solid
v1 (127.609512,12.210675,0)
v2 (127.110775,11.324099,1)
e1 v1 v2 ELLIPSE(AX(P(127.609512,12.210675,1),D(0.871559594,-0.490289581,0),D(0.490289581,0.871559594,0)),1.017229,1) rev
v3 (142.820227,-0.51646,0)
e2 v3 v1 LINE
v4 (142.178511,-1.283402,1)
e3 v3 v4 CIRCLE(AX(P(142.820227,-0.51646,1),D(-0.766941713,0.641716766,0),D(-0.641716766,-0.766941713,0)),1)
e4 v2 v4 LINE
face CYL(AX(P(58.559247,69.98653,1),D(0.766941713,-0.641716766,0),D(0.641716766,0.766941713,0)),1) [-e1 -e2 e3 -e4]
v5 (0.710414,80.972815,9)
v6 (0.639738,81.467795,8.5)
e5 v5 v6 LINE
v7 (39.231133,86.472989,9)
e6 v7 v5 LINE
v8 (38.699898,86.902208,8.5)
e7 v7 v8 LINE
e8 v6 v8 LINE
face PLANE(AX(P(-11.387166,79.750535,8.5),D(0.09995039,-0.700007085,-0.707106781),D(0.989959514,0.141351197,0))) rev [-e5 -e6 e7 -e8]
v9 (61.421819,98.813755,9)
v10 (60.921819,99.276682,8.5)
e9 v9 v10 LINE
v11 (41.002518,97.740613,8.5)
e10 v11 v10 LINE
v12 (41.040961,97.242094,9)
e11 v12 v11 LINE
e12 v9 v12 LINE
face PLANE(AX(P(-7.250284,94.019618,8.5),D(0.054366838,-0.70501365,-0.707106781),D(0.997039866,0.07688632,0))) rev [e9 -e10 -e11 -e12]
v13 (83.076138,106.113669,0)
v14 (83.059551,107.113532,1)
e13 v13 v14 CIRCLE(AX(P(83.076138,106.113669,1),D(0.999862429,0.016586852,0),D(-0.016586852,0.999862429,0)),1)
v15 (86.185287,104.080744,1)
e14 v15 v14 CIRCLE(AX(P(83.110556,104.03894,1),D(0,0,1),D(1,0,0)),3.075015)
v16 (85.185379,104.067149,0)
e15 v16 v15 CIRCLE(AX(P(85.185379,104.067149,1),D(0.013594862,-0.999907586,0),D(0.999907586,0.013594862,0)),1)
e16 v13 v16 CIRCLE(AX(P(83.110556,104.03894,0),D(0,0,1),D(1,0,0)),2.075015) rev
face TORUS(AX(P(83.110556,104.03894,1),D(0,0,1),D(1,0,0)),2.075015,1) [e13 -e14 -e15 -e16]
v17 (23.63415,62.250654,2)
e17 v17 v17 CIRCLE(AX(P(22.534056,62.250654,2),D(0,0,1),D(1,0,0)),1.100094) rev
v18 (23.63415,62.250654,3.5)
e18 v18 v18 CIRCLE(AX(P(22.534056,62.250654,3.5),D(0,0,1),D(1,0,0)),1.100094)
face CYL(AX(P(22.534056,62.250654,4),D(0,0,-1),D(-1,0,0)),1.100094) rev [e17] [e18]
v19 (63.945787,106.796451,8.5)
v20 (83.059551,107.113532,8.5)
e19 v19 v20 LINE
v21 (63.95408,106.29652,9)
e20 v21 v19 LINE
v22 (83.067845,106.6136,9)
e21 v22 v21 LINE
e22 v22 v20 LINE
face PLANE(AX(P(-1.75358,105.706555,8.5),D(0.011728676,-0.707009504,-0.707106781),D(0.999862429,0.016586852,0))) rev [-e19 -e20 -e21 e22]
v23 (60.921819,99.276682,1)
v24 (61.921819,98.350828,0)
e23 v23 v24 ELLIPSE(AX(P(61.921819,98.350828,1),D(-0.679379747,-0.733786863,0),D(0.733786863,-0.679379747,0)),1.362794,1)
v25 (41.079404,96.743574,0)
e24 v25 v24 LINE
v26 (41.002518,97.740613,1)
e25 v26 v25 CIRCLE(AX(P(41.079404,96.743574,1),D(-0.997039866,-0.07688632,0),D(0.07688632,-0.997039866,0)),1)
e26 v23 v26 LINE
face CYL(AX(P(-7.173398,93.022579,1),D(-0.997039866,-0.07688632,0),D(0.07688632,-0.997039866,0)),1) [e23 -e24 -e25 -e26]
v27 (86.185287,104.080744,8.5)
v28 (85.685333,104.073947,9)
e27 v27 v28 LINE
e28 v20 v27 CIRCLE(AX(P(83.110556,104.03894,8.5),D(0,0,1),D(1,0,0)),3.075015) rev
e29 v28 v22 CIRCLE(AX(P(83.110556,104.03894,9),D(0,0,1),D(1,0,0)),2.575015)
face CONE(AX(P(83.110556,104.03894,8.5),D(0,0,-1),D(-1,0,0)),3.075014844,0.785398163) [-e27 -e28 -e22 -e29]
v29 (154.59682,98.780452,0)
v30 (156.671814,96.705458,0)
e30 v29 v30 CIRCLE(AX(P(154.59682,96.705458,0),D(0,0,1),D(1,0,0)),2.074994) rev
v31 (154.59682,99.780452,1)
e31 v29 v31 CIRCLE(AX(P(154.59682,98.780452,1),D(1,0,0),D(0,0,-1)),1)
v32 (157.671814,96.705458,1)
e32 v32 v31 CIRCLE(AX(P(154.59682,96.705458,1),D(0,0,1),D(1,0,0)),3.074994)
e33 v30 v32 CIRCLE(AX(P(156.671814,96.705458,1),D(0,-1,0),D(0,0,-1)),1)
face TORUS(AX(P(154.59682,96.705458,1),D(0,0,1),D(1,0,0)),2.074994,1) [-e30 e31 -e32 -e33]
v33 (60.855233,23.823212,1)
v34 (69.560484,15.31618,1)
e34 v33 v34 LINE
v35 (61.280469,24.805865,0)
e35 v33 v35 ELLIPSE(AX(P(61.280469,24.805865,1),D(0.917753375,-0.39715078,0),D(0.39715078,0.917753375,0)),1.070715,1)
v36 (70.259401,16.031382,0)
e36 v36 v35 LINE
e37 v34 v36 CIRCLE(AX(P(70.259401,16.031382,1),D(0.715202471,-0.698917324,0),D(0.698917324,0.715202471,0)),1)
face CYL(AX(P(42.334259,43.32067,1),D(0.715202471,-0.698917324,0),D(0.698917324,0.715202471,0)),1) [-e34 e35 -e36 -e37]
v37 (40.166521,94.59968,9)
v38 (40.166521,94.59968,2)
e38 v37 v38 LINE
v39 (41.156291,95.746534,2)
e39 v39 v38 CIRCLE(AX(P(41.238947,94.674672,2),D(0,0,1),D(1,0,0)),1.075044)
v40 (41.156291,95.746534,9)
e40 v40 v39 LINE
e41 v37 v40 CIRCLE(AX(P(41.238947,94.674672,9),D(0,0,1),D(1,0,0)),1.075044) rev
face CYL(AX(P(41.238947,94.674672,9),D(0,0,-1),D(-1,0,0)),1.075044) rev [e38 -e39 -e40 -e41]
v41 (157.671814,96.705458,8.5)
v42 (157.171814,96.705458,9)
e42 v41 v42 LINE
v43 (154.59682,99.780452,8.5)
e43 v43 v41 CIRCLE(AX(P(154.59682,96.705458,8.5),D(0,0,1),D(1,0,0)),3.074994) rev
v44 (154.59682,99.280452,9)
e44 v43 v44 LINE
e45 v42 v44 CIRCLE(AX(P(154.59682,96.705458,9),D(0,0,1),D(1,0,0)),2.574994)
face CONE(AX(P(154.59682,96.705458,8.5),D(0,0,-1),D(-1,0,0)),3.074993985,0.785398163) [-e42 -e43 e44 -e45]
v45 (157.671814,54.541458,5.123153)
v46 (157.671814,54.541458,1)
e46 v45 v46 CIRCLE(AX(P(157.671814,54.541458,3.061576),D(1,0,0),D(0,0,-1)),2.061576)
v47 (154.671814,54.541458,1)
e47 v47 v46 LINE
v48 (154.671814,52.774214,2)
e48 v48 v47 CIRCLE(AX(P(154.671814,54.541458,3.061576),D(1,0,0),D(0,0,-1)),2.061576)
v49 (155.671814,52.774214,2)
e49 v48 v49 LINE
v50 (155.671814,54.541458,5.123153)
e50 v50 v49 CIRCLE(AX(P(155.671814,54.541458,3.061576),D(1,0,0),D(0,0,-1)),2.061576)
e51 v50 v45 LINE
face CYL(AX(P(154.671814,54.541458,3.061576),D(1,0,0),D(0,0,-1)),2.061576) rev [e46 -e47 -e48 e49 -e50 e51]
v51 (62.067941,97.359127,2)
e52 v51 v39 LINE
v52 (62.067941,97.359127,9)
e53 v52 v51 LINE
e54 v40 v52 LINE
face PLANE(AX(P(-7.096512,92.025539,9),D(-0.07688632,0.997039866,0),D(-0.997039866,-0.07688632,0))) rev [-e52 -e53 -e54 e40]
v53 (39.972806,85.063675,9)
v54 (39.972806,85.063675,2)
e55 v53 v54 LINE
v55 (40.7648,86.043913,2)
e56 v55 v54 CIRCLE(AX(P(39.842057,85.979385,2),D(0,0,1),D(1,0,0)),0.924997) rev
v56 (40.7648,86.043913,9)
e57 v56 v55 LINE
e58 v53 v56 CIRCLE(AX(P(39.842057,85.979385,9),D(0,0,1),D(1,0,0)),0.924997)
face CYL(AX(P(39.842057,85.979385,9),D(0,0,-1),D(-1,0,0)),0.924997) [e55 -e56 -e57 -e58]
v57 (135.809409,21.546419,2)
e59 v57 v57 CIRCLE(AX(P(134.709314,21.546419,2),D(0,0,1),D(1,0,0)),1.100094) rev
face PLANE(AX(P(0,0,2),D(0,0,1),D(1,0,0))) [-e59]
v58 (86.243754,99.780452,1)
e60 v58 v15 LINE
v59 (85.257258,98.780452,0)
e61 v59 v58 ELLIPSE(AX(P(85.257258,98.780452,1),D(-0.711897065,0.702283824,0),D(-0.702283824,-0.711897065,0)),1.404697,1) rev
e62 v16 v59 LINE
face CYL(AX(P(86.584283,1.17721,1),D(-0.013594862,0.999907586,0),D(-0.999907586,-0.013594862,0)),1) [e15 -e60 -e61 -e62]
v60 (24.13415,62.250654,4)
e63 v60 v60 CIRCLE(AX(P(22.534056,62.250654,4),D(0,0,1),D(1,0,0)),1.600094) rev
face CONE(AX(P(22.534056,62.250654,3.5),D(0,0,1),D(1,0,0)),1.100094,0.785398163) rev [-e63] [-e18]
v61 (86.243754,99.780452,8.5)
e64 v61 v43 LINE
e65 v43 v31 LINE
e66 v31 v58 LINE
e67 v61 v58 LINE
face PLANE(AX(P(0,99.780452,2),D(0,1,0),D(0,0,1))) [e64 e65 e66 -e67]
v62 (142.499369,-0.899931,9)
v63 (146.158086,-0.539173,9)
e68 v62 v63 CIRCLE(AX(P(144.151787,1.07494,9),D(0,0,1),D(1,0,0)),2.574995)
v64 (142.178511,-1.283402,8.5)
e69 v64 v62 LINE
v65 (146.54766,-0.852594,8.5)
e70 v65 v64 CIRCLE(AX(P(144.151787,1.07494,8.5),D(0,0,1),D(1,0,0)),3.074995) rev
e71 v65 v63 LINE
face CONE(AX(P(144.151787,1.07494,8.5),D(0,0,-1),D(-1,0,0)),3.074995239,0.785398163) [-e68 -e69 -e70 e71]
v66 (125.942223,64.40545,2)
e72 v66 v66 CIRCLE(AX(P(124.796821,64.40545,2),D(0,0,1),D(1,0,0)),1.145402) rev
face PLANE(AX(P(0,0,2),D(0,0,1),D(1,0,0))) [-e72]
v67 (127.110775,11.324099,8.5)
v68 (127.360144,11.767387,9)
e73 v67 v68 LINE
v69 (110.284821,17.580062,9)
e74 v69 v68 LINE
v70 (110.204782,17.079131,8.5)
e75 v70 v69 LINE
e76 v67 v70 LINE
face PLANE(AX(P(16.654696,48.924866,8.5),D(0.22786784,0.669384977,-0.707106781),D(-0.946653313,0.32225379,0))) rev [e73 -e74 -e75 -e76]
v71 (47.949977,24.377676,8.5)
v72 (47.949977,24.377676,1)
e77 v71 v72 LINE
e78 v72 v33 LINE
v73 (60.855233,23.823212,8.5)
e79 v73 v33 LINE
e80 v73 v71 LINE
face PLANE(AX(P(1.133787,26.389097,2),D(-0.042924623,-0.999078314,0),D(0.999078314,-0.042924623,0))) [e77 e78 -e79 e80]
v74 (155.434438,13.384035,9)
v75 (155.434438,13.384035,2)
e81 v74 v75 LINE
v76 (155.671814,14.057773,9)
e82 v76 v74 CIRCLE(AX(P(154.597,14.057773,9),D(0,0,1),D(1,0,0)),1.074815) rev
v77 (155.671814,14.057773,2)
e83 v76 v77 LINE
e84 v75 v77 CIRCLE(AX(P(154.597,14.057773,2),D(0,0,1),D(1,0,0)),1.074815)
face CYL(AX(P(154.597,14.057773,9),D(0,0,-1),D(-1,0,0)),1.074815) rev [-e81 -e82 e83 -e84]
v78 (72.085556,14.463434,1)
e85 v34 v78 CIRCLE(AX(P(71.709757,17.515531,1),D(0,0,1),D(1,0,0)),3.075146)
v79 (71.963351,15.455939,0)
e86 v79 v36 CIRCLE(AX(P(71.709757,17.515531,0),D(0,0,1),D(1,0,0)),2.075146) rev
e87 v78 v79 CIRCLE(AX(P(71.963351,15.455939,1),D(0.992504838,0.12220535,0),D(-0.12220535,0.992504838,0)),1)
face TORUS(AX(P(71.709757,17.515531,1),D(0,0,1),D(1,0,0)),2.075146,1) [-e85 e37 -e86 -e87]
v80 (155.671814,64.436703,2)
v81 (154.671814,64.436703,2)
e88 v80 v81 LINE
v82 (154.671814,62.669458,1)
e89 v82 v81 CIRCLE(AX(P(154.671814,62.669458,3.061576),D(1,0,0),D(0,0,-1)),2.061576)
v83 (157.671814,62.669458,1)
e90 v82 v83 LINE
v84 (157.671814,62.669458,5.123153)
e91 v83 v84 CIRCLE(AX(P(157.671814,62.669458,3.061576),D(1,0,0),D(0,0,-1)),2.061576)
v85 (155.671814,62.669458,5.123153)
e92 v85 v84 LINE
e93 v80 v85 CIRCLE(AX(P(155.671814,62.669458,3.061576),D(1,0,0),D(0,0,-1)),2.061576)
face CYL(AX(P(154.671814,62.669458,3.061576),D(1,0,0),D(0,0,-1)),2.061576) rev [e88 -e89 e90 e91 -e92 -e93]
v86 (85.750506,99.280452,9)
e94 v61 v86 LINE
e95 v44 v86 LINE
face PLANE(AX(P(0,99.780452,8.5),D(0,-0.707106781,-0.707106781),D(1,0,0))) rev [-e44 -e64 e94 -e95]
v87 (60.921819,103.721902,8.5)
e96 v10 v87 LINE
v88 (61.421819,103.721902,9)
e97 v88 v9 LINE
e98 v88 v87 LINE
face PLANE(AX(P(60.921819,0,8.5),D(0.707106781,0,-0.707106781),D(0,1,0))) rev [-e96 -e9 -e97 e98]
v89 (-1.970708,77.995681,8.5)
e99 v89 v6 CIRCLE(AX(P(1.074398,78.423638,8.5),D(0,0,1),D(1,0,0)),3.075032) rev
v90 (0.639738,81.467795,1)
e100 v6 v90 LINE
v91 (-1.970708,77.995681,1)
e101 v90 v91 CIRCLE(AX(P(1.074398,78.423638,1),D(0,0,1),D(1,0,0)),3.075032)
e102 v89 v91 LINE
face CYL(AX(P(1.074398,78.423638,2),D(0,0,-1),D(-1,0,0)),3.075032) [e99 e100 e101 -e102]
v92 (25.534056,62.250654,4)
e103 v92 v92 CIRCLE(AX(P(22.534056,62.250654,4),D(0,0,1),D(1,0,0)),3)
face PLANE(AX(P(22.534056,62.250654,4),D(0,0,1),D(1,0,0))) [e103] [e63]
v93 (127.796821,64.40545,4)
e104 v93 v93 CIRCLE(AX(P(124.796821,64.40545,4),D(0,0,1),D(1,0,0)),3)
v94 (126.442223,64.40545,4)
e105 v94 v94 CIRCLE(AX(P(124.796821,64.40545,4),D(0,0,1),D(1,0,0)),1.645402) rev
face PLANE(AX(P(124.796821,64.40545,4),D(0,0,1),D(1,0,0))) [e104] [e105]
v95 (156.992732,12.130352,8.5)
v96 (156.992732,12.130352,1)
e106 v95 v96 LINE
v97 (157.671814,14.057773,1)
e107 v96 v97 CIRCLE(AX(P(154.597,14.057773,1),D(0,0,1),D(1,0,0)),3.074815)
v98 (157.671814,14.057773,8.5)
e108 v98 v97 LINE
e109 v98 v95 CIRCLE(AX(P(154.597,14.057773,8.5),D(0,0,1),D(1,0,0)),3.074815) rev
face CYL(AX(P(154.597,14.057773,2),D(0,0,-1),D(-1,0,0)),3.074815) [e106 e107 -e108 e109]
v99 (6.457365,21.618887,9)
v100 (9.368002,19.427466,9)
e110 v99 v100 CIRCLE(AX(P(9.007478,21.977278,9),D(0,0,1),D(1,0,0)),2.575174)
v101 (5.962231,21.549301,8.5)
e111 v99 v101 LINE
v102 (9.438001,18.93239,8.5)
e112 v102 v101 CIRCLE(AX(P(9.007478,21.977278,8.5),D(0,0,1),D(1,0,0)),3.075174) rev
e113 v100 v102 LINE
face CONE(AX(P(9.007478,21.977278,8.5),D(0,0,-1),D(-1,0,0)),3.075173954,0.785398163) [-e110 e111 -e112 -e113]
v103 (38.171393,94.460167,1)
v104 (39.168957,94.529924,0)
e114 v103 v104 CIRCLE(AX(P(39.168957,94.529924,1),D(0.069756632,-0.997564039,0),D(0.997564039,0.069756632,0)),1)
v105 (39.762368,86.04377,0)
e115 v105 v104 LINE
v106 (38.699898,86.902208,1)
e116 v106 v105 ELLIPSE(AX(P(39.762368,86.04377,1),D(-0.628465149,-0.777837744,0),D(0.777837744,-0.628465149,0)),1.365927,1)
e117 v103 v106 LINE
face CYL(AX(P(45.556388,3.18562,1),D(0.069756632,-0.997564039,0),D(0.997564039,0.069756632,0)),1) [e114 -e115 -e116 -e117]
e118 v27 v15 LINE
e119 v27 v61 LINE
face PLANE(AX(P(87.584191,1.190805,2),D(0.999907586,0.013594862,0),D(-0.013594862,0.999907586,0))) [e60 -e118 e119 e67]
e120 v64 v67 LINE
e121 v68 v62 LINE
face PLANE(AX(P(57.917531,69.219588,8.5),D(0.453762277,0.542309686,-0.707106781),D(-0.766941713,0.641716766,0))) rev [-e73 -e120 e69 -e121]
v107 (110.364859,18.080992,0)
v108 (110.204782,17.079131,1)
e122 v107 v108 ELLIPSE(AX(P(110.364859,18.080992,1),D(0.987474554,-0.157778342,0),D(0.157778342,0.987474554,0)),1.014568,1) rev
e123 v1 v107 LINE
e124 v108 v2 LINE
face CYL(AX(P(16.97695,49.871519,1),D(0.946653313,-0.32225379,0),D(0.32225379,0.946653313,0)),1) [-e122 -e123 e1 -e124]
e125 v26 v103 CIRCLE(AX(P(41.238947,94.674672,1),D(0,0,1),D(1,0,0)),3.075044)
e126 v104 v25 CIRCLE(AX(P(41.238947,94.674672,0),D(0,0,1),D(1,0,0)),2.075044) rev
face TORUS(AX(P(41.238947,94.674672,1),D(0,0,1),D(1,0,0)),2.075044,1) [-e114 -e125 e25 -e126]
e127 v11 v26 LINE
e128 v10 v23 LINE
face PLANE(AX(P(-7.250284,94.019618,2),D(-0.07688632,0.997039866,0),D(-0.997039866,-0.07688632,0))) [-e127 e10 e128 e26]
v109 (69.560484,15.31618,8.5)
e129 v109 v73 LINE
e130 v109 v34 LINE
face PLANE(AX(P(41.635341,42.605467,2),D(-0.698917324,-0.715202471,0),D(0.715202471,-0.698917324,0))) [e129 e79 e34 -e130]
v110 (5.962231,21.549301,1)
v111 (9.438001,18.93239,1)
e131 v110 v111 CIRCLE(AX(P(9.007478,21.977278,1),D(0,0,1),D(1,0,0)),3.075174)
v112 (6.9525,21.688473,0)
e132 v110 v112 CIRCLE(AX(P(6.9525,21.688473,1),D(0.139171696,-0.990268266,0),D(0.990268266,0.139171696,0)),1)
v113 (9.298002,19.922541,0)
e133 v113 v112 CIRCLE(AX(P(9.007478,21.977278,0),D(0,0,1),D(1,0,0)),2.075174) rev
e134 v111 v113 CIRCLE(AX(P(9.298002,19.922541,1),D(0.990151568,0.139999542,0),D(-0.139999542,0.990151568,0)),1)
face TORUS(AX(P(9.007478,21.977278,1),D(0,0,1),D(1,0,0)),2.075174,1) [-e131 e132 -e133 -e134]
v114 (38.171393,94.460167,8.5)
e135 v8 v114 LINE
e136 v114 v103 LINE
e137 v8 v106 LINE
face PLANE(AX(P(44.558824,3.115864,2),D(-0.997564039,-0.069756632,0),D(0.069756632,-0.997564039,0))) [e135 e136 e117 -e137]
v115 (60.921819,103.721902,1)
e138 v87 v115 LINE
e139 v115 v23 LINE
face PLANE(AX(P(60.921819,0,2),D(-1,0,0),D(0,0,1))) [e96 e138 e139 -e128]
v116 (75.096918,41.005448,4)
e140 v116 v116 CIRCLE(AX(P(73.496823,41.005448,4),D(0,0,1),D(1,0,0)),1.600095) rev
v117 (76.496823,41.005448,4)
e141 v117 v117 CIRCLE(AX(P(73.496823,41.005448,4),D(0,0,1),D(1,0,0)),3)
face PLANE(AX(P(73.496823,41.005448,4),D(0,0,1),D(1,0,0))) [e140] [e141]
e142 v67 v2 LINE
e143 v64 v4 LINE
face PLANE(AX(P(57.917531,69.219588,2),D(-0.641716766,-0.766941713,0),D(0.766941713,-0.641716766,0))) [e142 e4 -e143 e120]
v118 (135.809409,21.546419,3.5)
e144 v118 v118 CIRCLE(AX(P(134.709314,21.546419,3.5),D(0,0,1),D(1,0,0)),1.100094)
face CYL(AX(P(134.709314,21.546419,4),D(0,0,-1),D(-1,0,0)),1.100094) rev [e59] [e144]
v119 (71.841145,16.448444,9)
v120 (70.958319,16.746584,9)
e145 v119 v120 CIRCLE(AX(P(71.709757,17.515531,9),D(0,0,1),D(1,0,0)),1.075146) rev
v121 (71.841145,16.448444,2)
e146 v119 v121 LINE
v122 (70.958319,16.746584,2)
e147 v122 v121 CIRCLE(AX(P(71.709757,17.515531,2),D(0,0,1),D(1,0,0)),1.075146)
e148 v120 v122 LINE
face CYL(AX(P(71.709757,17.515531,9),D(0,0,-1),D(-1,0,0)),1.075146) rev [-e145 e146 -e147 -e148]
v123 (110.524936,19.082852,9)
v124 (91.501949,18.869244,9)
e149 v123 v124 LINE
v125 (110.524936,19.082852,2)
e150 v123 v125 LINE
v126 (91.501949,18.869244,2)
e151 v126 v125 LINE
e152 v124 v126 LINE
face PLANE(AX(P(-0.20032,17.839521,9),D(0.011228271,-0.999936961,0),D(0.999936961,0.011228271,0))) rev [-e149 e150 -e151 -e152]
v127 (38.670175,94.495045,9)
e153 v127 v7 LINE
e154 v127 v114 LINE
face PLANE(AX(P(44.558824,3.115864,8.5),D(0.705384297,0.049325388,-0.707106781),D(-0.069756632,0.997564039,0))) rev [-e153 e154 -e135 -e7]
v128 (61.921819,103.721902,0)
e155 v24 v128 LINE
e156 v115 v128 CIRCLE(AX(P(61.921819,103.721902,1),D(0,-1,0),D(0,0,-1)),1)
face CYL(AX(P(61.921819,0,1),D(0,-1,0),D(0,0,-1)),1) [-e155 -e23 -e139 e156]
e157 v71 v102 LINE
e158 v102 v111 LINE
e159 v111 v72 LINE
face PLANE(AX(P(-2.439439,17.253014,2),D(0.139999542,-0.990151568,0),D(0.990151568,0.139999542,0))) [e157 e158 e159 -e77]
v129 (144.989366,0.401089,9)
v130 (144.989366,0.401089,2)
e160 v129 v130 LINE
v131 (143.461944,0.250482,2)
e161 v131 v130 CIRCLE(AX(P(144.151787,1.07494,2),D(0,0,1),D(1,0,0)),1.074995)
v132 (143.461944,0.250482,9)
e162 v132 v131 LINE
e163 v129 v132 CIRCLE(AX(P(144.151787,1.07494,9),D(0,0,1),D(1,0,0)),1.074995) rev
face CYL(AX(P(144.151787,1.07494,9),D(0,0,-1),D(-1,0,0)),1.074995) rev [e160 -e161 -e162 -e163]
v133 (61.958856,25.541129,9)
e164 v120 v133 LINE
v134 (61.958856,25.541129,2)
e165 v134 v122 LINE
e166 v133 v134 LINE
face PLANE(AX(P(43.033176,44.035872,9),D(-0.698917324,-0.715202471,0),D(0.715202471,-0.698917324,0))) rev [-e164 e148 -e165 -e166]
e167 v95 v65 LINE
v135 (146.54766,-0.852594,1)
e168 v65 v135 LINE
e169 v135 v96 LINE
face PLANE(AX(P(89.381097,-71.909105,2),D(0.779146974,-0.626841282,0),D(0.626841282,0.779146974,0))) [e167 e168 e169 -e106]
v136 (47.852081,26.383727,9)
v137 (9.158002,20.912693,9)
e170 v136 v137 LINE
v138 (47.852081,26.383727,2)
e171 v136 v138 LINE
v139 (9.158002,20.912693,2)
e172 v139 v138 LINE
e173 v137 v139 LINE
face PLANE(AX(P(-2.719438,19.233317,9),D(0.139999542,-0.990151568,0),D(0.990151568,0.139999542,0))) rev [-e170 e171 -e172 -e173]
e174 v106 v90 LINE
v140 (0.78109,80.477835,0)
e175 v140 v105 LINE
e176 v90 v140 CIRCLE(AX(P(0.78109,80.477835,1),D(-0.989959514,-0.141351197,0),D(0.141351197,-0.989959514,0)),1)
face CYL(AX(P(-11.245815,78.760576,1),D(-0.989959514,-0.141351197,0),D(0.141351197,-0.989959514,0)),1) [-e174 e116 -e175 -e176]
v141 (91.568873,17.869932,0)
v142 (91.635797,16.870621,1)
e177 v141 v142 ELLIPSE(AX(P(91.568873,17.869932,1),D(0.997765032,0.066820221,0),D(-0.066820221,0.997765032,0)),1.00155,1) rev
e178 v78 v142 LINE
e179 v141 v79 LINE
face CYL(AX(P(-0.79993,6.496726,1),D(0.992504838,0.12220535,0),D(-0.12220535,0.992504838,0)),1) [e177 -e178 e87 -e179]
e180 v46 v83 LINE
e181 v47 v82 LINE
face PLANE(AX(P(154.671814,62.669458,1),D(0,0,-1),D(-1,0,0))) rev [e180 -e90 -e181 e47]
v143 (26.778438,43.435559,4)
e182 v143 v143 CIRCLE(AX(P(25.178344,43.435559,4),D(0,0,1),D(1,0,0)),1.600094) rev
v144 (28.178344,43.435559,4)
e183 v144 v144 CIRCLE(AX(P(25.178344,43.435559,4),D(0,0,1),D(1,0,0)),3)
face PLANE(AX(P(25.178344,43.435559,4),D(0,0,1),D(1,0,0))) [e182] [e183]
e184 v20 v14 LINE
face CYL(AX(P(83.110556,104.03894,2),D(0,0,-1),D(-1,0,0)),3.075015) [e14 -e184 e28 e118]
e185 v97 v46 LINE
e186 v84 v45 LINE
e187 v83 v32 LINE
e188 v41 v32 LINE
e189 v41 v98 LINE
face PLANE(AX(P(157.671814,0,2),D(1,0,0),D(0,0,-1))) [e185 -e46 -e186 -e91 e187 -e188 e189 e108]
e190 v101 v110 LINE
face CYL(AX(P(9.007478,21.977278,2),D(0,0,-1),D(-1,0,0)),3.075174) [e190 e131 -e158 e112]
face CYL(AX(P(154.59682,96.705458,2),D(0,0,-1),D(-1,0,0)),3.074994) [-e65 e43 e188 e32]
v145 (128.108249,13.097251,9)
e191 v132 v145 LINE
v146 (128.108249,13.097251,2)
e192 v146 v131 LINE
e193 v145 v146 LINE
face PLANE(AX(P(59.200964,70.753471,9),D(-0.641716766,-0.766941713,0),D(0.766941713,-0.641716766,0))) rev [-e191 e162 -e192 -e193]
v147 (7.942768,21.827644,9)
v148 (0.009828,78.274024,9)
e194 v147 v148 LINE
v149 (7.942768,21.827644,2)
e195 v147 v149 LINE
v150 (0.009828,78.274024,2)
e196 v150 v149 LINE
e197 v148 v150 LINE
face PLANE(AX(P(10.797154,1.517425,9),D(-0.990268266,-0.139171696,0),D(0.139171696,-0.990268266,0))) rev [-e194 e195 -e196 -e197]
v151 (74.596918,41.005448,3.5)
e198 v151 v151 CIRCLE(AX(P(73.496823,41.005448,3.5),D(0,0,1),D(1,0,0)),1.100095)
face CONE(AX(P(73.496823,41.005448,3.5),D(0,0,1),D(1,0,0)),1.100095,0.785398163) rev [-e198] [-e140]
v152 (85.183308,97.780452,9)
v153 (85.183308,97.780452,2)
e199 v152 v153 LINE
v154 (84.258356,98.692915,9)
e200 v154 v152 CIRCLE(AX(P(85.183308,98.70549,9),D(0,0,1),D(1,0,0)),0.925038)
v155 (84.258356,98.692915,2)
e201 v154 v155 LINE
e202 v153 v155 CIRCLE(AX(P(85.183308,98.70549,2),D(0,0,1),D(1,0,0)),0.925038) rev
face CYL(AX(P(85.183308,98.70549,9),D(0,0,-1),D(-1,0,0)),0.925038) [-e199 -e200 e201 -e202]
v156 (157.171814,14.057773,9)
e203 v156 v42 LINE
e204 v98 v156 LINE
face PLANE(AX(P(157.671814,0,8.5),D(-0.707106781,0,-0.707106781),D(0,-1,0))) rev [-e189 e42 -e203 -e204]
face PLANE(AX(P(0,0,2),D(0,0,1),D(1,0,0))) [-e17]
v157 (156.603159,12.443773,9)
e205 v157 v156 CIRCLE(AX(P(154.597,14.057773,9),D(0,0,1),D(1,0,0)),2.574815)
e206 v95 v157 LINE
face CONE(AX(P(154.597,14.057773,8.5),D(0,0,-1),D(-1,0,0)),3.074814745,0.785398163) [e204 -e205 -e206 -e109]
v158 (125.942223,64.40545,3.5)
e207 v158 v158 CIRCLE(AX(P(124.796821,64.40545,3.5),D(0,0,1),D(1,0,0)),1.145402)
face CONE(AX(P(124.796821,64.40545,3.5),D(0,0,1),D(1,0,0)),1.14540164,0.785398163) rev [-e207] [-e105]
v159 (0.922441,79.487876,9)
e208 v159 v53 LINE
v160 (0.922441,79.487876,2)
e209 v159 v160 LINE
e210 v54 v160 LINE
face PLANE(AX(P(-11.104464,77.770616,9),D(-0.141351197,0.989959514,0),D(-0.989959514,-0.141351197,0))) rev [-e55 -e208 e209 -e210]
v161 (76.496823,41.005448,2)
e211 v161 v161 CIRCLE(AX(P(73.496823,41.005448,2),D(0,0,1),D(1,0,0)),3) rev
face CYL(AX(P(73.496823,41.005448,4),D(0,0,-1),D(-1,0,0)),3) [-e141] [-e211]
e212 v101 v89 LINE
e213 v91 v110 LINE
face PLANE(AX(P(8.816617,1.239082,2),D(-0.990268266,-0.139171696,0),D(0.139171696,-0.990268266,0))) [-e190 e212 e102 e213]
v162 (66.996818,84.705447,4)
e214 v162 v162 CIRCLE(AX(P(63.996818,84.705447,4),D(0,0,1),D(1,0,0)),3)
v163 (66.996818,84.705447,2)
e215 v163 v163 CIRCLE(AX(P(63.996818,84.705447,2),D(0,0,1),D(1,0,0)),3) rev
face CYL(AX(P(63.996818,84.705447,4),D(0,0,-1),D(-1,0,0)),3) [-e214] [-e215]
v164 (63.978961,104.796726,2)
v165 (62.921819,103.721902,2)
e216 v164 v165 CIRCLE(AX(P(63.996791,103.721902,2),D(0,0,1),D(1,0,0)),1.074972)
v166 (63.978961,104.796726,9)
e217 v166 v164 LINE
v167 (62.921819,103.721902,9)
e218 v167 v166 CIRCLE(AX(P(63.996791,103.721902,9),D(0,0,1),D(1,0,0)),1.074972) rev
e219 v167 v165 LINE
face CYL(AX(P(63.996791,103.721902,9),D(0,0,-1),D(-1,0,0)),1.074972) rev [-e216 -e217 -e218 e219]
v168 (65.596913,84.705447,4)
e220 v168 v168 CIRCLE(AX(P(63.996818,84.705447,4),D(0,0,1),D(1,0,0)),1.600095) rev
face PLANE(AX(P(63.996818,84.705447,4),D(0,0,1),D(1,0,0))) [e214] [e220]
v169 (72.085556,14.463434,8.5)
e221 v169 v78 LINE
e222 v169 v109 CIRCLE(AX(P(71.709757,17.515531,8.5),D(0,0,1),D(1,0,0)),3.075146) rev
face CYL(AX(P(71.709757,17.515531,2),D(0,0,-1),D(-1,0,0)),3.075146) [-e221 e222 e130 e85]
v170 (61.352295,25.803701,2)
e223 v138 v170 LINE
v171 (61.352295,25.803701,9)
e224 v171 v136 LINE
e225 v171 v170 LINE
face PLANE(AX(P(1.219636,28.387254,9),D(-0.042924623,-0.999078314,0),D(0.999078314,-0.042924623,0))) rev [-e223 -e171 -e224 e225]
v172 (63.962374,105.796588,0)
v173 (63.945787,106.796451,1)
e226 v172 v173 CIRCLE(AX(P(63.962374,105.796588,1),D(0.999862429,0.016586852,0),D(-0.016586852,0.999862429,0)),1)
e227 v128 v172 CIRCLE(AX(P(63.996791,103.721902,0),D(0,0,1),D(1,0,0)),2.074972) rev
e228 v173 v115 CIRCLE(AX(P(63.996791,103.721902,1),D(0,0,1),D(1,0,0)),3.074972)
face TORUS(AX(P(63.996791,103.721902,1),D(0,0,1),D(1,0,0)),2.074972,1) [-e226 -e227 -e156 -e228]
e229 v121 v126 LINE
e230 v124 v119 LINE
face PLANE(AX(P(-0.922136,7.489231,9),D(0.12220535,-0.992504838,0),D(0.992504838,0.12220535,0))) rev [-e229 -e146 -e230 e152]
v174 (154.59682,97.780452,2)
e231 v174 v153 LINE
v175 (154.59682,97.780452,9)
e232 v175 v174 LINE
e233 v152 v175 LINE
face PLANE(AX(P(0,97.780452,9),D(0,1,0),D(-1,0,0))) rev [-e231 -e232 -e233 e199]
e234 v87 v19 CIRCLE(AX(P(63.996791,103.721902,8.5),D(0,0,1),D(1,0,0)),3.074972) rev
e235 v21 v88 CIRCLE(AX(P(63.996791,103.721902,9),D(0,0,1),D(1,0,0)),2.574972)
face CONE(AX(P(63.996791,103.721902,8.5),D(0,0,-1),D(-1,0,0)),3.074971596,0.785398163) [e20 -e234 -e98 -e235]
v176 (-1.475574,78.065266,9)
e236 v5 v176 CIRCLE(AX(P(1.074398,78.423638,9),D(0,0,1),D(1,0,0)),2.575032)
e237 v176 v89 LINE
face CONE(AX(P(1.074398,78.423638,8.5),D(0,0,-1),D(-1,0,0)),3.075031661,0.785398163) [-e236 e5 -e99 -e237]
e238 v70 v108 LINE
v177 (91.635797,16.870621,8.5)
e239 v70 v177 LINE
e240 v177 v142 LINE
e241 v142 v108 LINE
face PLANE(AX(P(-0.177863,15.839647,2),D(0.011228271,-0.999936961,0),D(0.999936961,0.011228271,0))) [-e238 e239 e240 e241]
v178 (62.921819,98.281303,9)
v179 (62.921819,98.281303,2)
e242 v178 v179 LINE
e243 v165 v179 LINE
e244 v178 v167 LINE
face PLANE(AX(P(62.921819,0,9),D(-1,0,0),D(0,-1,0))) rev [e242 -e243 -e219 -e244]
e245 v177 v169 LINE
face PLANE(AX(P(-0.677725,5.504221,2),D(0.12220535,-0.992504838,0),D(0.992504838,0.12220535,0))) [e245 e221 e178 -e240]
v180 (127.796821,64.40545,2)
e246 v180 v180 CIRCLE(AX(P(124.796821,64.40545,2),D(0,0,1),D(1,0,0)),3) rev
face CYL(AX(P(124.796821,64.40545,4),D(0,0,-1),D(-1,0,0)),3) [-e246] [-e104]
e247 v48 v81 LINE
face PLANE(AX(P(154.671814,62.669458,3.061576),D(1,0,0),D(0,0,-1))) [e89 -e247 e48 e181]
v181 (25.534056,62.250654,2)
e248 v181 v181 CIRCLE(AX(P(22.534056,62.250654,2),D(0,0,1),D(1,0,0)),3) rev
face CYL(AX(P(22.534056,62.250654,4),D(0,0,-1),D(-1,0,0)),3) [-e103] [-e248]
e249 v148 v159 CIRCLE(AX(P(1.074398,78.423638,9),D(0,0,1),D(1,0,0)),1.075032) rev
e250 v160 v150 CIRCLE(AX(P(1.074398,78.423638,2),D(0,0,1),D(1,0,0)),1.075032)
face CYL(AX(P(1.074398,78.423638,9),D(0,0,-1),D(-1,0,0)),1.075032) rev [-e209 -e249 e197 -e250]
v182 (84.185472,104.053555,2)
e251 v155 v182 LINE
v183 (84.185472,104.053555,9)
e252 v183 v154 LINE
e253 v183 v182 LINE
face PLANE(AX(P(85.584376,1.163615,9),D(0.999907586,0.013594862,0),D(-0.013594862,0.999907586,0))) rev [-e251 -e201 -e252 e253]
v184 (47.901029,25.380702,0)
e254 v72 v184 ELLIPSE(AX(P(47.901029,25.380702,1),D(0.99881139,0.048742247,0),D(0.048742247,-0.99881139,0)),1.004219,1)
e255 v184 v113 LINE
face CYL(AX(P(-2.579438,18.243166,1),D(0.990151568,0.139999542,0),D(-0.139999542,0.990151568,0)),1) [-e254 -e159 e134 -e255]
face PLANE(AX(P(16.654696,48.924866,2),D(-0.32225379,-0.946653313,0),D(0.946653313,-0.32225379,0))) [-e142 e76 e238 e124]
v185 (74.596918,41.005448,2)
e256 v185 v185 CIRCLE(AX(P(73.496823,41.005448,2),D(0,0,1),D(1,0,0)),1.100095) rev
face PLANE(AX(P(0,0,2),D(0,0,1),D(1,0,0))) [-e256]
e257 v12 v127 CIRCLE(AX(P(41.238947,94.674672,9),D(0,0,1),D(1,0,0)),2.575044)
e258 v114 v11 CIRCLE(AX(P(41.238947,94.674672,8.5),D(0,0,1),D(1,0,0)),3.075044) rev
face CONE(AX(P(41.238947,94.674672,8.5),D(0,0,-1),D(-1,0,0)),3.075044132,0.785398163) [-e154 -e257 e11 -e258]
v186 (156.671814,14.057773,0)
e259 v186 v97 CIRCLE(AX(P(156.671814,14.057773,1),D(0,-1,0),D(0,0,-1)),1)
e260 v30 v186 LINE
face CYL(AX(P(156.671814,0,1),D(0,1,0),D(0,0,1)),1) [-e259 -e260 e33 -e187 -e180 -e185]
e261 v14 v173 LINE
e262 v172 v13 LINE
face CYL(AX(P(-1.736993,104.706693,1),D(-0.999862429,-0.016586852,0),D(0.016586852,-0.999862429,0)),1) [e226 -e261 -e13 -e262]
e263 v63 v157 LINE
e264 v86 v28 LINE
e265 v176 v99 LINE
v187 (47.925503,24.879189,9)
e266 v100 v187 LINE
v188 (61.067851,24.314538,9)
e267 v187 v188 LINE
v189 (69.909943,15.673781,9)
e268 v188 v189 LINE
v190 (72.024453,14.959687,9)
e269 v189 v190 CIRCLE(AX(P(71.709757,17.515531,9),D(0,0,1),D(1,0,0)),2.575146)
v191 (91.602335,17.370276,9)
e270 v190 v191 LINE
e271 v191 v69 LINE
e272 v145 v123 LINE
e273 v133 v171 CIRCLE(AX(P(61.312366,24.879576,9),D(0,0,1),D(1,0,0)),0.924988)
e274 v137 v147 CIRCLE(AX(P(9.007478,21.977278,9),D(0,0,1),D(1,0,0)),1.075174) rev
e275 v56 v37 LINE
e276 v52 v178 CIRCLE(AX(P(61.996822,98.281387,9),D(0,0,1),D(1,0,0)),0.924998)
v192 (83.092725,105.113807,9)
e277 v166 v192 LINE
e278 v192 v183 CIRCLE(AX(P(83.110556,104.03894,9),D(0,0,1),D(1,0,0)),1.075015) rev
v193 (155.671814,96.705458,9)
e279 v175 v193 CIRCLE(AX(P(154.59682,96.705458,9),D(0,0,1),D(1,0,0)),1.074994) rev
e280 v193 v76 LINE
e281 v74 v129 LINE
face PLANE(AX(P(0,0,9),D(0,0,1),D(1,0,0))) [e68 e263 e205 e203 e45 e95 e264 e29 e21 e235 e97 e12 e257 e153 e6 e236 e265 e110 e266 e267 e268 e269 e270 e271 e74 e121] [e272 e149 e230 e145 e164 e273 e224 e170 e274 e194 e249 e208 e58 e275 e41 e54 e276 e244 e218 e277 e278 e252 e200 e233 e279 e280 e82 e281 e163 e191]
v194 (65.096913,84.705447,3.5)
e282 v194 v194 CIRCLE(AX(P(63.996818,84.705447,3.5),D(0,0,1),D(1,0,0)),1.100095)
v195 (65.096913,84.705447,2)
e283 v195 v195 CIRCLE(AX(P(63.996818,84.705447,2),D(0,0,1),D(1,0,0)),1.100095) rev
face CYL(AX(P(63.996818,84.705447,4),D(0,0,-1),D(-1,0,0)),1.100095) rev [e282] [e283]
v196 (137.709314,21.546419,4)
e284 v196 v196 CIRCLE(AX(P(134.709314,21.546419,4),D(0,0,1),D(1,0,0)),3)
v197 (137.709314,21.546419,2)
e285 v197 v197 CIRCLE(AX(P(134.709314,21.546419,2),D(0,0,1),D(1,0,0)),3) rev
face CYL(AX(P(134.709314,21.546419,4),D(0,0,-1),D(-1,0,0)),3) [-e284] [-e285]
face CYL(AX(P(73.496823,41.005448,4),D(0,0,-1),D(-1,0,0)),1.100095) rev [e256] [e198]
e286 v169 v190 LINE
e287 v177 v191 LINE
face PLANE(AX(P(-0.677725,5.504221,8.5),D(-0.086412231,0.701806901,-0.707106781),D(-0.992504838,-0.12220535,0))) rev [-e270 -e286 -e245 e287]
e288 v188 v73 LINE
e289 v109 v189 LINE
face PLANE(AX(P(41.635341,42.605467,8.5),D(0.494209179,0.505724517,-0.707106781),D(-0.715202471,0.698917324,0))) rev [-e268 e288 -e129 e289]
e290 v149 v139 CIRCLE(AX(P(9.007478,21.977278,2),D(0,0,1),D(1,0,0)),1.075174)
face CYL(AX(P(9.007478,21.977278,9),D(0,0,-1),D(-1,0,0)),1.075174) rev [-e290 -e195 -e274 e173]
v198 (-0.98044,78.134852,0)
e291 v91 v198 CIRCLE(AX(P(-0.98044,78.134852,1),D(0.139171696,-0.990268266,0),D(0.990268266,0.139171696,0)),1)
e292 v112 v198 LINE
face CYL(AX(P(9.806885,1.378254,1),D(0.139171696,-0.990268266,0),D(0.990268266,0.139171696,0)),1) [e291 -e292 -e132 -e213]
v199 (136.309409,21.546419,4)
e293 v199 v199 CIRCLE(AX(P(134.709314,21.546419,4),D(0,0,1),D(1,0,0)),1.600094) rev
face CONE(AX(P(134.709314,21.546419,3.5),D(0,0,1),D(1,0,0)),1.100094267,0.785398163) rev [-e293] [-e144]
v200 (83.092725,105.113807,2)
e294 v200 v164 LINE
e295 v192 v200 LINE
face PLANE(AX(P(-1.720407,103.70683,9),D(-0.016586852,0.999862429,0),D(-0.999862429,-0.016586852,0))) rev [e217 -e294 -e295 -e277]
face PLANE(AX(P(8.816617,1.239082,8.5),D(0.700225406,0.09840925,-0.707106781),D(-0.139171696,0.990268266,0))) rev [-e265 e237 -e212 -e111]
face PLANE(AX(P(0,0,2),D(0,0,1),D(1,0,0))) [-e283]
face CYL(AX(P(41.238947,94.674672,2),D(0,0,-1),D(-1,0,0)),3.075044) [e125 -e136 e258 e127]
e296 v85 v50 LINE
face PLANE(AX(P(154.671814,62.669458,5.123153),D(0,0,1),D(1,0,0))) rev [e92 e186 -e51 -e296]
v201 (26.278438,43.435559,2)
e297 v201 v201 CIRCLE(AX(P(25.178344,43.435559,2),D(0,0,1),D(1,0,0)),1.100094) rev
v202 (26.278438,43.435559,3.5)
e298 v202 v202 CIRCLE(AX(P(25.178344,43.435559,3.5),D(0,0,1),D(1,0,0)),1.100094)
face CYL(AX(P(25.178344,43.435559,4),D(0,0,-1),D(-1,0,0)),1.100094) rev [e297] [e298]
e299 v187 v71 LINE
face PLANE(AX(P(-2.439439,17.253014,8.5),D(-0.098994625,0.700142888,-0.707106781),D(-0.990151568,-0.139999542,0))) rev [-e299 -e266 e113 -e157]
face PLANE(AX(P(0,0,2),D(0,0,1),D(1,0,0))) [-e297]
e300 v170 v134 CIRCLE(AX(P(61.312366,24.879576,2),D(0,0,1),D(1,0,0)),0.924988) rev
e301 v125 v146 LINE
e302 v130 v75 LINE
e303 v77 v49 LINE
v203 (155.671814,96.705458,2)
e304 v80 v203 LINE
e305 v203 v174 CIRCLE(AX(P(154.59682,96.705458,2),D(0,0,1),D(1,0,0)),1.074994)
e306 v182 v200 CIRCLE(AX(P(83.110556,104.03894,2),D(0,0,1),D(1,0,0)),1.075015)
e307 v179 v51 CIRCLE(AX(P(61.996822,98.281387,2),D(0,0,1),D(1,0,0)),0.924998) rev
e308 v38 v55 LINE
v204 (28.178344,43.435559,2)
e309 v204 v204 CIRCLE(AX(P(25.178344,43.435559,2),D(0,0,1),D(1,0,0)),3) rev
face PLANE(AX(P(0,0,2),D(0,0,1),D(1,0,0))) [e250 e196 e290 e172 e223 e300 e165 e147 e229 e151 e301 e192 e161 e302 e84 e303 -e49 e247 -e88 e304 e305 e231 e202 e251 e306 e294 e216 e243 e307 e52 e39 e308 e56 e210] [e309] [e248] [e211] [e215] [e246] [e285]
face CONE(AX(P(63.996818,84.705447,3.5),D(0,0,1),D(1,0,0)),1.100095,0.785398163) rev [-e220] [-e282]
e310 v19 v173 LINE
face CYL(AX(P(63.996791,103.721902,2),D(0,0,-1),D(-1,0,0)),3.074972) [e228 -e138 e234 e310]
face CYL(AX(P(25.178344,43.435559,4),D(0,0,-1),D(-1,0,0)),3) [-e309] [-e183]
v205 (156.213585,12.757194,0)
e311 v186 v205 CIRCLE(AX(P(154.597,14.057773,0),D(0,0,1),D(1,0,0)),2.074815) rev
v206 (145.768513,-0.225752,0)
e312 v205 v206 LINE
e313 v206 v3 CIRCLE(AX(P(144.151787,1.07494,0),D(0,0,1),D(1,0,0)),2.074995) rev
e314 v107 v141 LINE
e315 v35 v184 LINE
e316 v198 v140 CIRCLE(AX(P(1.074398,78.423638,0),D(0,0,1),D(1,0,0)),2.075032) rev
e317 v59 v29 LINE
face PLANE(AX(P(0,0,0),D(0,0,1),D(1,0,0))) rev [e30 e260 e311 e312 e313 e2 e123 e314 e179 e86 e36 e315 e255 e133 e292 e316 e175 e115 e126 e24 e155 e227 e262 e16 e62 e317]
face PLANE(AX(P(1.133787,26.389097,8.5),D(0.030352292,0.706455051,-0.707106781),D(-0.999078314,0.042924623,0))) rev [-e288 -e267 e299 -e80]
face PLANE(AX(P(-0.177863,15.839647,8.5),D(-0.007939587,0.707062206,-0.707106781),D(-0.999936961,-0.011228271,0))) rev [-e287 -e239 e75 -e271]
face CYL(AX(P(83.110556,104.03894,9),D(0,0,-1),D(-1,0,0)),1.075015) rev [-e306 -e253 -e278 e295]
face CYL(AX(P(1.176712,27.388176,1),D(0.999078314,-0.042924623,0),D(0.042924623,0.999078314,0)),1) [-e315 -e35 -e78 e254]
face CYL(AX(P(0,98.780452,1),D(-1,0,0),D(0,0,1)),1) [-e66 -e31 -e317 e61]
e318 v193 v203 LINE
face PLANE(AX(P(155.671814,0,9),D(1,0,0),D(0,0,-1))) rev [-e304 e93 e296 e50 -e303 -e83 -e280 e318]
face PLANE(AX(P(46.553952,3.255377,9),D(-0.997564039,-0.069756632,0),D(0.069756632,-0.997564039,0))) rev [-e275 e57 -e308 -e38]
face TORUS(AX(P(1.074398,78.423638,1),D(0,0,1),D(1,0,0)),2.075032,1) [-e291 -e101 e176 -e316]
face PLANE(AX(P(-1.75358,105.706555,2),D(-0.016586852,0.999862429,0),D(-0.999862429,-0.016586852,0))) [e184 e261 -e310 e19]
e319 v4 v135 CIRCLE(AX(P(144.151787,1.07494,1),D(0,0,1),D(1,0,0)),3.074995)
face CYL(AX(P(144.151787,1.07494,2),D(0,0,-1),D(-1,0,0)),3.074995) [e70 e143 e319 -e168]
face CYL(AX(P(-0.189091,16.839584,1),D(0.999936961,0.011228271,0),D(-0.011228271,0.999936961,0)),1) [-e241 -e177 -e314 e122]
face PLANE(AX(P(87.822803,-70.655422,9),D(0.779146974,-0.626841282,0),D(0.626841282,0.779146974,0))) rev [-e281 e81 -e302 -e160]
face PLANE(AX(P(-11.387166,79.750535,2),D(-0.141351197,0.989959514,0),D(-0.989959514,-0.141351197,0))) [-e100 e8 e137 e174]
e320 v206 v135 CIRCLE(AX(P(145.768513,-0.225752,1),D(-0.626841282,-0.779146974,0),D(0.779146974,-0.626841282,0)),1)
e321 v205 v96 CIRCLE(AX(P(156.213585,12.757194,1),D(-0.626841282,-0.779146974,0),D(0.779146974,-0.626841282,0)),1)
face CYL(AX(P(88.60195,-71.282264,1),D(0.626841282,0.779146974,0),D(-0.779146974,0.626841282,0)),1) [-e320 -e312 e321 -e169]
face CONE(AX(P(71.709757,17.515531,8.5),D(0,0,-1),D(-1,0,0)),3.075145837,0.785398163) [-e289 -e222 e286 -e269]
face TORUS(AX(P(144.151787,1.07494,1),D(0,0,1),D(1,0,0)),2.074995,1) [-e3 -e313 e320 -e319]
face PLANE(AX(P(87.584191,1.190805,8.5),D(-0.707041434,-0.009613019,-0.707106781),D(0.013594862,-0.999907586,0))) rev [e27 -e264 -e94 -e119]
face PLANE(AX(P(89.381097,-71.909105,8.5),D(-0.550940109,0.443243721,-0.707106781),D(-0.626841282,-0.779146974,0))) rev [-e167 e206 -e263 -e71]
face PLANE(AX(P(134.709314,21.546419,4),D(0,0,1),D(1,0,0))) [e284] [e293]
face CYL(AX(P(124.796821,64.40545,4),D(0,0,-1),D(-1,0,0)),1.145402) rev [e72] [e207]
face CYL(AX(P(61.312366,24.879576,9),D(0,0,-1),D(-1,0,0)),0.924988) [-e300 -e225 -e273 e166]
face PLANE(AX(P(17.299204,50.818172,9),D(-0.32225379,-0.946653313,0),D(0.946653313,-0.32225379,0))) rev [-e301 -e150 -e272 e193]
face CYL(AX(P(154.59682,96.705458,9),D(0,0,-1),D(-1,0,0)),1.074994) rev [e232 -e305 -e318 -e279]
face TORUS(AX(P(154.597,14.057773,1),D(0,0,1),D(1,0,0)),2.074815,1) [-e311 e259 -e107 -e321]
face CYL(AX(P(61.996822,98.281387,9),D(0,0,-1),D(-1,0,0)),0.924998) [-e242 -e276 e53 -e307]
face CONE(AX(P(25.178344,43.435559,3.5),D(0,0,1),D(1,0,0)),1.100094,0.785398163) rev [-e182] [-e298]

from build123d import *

# Parameters (mm, degrees)
BOSS_EXTRUDE1_DEPTH = 2
BOSS_EXTRUDE2_DEPTH = 9
SKETCH7_R           = 3
SKETCH7_R_2         = 1.100094
SKETCH7_R_3         = 1.100095
SKETCH7_R_4         = 1.14540164
SKETCH7_R_5         = 1.100094267
BOSS_EXTRUDE3_DEPTH = 4
CUT_EXTRUDE1_DEPTH  = 3
FILLET2_R           = 1
CHAMFER1_SIZE       = 0.5
CHAMFER2_SIZE       = 0.5


with BuildPart() as part:
    # Sketch3 → Boss-Extrude1 (new body)
    with BuildSketch(Plane.XY):
        with BuildLine():
            Line((60.855233133, 23.823211938), (47.949977192, 24.377676222))
            Line((47.949977192, 24.377676222), (9.438001399, 18.932389733))
            ThreePointArc((9.438001399, 18.932389733), (7.157815869, 19.520564151), (5.962231275, 21.549300871))
            Line((5.962231275, 21.549300871), (-1.970708405, 77.995680607))
            ThreePointArc((-1.970708405, 77.995680607), (-1.383464331, 80.271537635), (0.639738461, 81.467794829))
            Line((0.639738461, 81.467794829), (38.699898469, 86.902208152))
            Line((38.699898469, 86.902208152), (38.171393284, 94.460167157))
            ThreePointArc((38.171393284, 94.460167157), (38.910984807, 96.683773594), (41.002517903, 97.740613468))
            Line((41.002517903, 97.740613468), (60.921819416, 99.276682226))
            Line((60.921819416, 99.276682226), (60.921819416, 103.721902307))
            ThreePointArc((60.921819416, 103.721902307), (61.804499235, 105.878127499), (63.945786912, 106.796450874))
            Line((63.945786912, 106.796450874), (83.059551455, 107.113531682))
            ThreePointArc((83.059551455, 107.113531682), (85.251859467, 106.245869167), (86.185286941, 104.080744272))
            Line((86.185286941, 104.080744272), (86.24375422, 99.780452187))
            Line((86.24375422, 99.780452187), (154.596820419, 99.780452187))
            ThreePointArc((154.596820419, 99.780452187), (156.771169517, 98.879807301), (157.671814403, 96.705458202))
            Line((157.671814403, 96.705458202), (157.671814403, 14.057773112))
            ThreePointArc((157.671814403, 14.057773112), (157.497078938, 13.035997261), (156.992732263, 12.130352296))
            Line((156.992732263, 12.130352296), (146.547659954, -0.852593653))
            ThreePointArc((146.547659954, -0.852593653), (144.453525054, -1.98521487), (142.178510717, -1.283401812))
            Line((142.178510717, -1.283401812), (127.110775499, 11.324099062))
            Line((127.110775499, 11.324099062), (110.204782414, 17.079131321))
            Line((110.204782414, 17.079131321), (91.635796855, 16.870620568))
            Line((91.635796855, 16.870620568), (72.085555936, 14.46343429))
            ThreePointArc((72.085555936, 14.46343429), (70.725838171, 14.602041008), (69.560483965, 15.316179508))
            Line((69.560483965, 15.316179508), (60.855233133, 23.823211938))
        make_face()
    extrude(amount=BOSS_EXTRUDE1_DEPTH)

    # Sketch4 → Boss-Extrude2 (add)
    with BuildSketch(Plane.XY):
        with BuildLine():
            Line((47.949977192, 24.377676222), (60.855233133, 23.823211938))
            Line((60.855233133, 23.823211938), (69.560483965, 15.316179508))
            ThreePointArc((69.560483965, 15.316179508), (70.725838171, 14.602041008), (72.085555936, 14.46343429))
            Line((72.085555936, 14.46343429), (91.635796855, 16.870620568))
            Line((91.635796855, 16.870620568), (110.204782414, 17.079131321))
            Line((110.204782414, 17.079131321), (127.110775499, 11.324099062))
            Line((127.110775499, 11.324099062), (142.178510717, -1.283401812))
            ThreePointArc((142.178510717, -1.283401812), (144.453525054, -1.98521487), (146.547659954, -0.852593653))
            Line((146.547659954, -0.852593653), (156.992732263, 12.130352296))
            ThreePointArc((156.992732263, 12.130352296), (157.497078938, 13.035997261), (157.671814403, 14.057773112))
            Line((157.671814403, 14.057773112), (157.671814403, 96.705458202))
            ThreePointArc((157.671814403, 96.705458202), (156.771169517, 98.879807301), (154.596820419, 99.780452187))
            Line((154.596820419, 99.780452187), (86.24375422, 99.780452187))
            Line((86.24375422, 99.780452187), (86.185286941, 104.080744272))
            ThreePointArc((86.185286941, 104.080744272), (85.251859467, 106.245869167), (83.059551455, 107.113531682))
            Line((83.059551455, 107.113531682), (63.945786912, 106.796450874))
            ThreePointArc((63.945786912, 106.796450874), (61.804499235, 105.878127499), (60.921819416, 103.721902307))
            Line((60.921819416, 103.721902307), (60.921819416, 99.276682226))
            Line((60.921819416, 99.276682226), (41.002517903, 97.740613468))
            ThreePointArc((41.002517903, 97.740613468), (38.910984807, 96.683773594), (38.171393284, 94.460167157))
            Line((38.171393284, 94.460167157), (38.699898469, 86.902208152))
            Line((38.699898469, 86.902208152), (0.639738461, 81.467794829))
            ThreePointArc((0.639738461, 81.467794829), (-1.383464331, 80.271537635), (-1.970708405, 77.995680607))
            Line((-1.970708405, 77.995680607), (5.962231275, 21.549300871))
            ThreePointArc((5.962231275, 21.549300871), (7.157815869, 19.520564151), (9.438001399, 18.932389733))
            Line((9.438001399, 18.932389733), (47.949977192, 24.377676222))
        make_face()
        with BuildLine():
            ThreePointArc((84.258355662, 98.692914663), (84.533669024, 98.04695842), (85.183308419, 97.780452187))
            Line((85.183308419, 97.780452187), (154.596820419, 97.780452187))
            ThreePointArc((154.596820419, 97.780452187), (155.356955955, 97.465593738), (155.671814403, 96.705458202))
            Line((155.671814403, 96.705458202), (155.671814403, 14.057773112))
            ThreePointArc((155.671814403, 14.057773112), (155.610734868, 13.70060696), (155.434438315, 13.38403486))
            Line((155.434438315, 13.38403486), (144.989366006, 0.401088911))
            ThreePointArc((144.989366006, 0.401088911), (144.257272174, 0.005133041), (143.461944249, 0.250481615))
            Line((143.461944249, 0.250481615), (128.108249423, 13.097251096))
            Line((128.108249423, 13.097251096), (110.524936275, 19.082852408))
            Line((110.524936275, 19.082852408), (91.501949272, 18.869243682))
            Line((91.501949272, 18.869243682), (71.841145237, 16.448443965))
            ThreePointArc((71.841145237, 16.448443965), (71.365754809, 16.496904248), (70.958318613, 16.74658445))
            Line((70.958318613, 16.74658445), (61.958856362, 25.54112911))
            ThreePointArc((61.958856362, 25.54112911), (61.679828995, 25.728441638), (61.352295386, 25.803701118))
            Line((61.352295386, 25.803701118), (47.852081394, 26.383727313))
            Line((47.852081394, 26.383727313), (9.158002316, 20.91269287))
            ThreePointArc((9.158002316, 20.91269287), (8.360780393, 21.118336461), (7.942767807, 21.827644264))
            Line((7.942767807, 21.827644264), (0.009828128, 78.274024))
            ThreePointArc((0.009828128, 78.274024), (0.215128769, 79.069664055), (0.922440855, 79.487875801))
            Line((0.922440855, 79.487875801), (39.972806225, 85.063675424))
            ThreePointArc((39.972806225, 85.063675424), (40.561555536, 85.398058084), (40.76480024, 86.043913413))
            Line((40.76480024, 86.043913413), (40.166521363, 94.599680421))
            ThreePointArc((40.166521363, 94.599680421), (40.425084652, 95.377059525), (41.156290542, 95.746533736))
            Line((41.156290542, 95.746533736), (62.067941403, 97.359127107))
            ThreePointArc((62.067941403, 97.359127107), (62.675544492, 97.652931317), (62.921819416, 98.281303094))
            Line((62.921819416, 98.281303094), (62.921819416, 103.721902307))
            ThreePointArc((62.921819416, 103.721902307), (63.230393236, 104.475691655), (63.978960617, 104.796726017))
            Line((63.978960617, 104.796726017), (83.09272516, 105.113806824))
            ThreePointArc((83.09272516, 105.113806824), (83.859148665, 104.810474928), (84.185471769, 104.053554549))
            Line((84.185471769, 104.053554549), (84.258355662, 98.692914663))
        make_face(mode=Mode.SUBTRACT)
    extrude(amount=BOSS_EXTRUDE2_DEPTH)

    # Sketch7 → Boss-Extrude3 (add)
    # profile 1 of 6: a face of its own
    with BuildSketch(Plane.XY):
        with Locations((25.178343626, 43.435558637)):
            Circle(SKETCH7_R)
        with Locations((25.178343626, 43.435558637)):
            Circle(SKETCH7_R_2, mode=Mode.SUBTRACT)
    # profile 2 of 6: a face of its own
    with BuildSketch(Plane.XY):
        with Locations((22.534055897, 62.250653675)):
            Circle(SKETCH7_R)
        with Locations((22.534055897, 62.250653675)):
            Circle(SKETCH7_R_2, mode=Mode.SUBTRACT)
    # profile 3 of 6: a face of its own
    with BuildSketch(Plane.XY):
        with Locations((63.99681822, 84.705447078)):
            Circle(SKETCH7_R)
        with Locations((63.99681822, 84.705447078)):
            Circle(SKETCH7_R_3, mode=Mode.SUBTRACT)
    # profile 4 of 6: a face of its own
    with BuildSketch(Plane.XY):
        with Locations((73.496822591, 41.005447941)):
            Circle(SKETCH7_R)
        with Locations((73.496822591, 41.005447941)):
            Circle(SKETCH7_R_3, mode=Mode.SUBTRACT)
    # profile 5 of 6: a face of its own
    with BuildSketch(Plane.XY):
        with Locations((124.796820928, 64.405450202)):
            Circle(SKETCH7_R)
        with Locations((124.796820928, 64.405450202)):
            Circle(SKETCH7_R_4, mode=Mode.SUBTRACT)
    # profile 6 of 6: a face of its own
    with BuildSketch(Plane.XY):
        with Locations((134.70931431, 21.546419059)):
            Circle(SKETCH7_R)
        with Locations((134.70931431, 21.546419059)):
            Circle(SKETCH7_R_5, mode=Mode.SUBTRACT)
    extrude(amount=BOSS_EXTRUDE3_DEPTH)

    # Sketch8 → Cut-Extrude1 (cut)
    with BuildSketch(Plane(origin=(157.671814403, 0, 0), x_dir=(0, 0, -1), z_dir=(1, 0, 0))):
        with BuildLine():
            Line((-1, 62.669458202), (-1, 54.541458202))
            ThreePointArc((-1, 54.541458202), (-3.061576359, 52.479881843), (-5.123152718, 54.541458202))
            Line((-5.123152718, 54.541458202), (-5.123152718, 62.669458202))
            ThreePointArc((-5.123152718, 62.669458202), (-3.061576359, 64.731034561), (-1, 62.669458202))
        make_face()
    extrude(amount=-CUT_EXTRUDE1_DEPTH, mode=Mode.SUBTRACT)

    # Fillet2
    fillet2_edges = [part.edges().sort_by_distance(p)[0] for p in [
        (65.207858549, 19.569695723, 0),
        (54.402605163, 24.10044408, 0),
        (28.693989296, 21.655032978, 0),
        (7.157815869, 19.520564151, 0),
        (1.995761435, 49.772490739, 0),
        (-1.383464331, 80.271537635, 0),
        (19.669818465, 84.18500149, 0),
        (38.435645877, 90.681187654, 0),
        (38.910984807, 96.683773594, 0),
        (50.962168659, 98.508647847, 0),
        (60.921819416, 101.499292266, 0),
        (61.804499235, 105.878127499, 0),
        (73.502669184, 106.954991278, 0),
        (85.251859467, 106.245869167, 0),
        (86.21452058, 101.930598229, 0),
        (120.420287319, 99.780452187, 0),
        (156.771169517, 98.879807301, 0),
        (157.671814403, 55.381615657, 0),
        (157.497078938, 13.035997261, 0),
        (151.770196108, 5.638879321, 0),
        (144.453525054, -1.98521487, 0),
        (134.644643108, 5.020348625, 0),
        (118.657778957, 14.201615191, 0),
        (100.920289635, 16.974875944, 0),
        (81.860676395, 15.667027429, 0),
        (70.725838171, 14.602041008, 0),
    ]]
    fillet(fillet2_edges, radius=FILLET2_R - 0.0001)  # a hair under: the kernel refuses the full size

    # Chamfer1
    chamfer1_edges = [part.edges().sort_by_distance(p)[0] for p in [
        (70.725838171, 14.602041008, 9),
        (81.860676395, 15.667027429, 9),
        (100.920289635, 16.974875944, 9),
        (118.657778957, 14.201615191, 9),
        (134.644643108, 5.020348625, 9),
        (144.453525054, -1.98521487, 9),
        (151.770196108, 5.638879321, 9),
        (157.497078938, 13.035997261, 9),
        (157.671814403, 55.381615657, 9),
        (156.771169517, 98.879807301, 9),
        (120.420287319, 99.780452187, 9),
        (86.21452058, 101.930598229, 9),
        (85.251859467, 106.245869167, 9),
        (73.502669184, 106.954991278, 9),
        (61.804499235, 105.878127499, 9),
        (60.921819416, 101.499292266, 9),
        (50.962168659, 98.508647847, 9),
        (38.910984807, 96.683773594, 9),
        (38.435645877, 90.681187654, 9),
        (19.669818465, 84.18500149, 9),
        (-1.383464331, 80.271537635, 9),
        (1.995761435, 49.772490739, 9),
        (7.157815869, 19.520564151, 9),
        (28.693989296, 21.655032978, 9),
        (54.402605163, 24.10044408, 9),
        (65.207858549, 19.569695723, 9),
    ]]
    chamfer(chamfer1_edges, length=CHAMFER1_SIZE)

    # Chamfer2
    chamfer2_edges = [part.edges().sort_by_distance(p)[0] for p in [
        (133.609220043, 21.546419059, 4),
        (123.651419288, 64.405450202, 4),
        (72.396727591, 41.005447941, 4),
        (62.89672322, 84.705447078, 4),
        (21.433961897, 62.250653675, 4),
        (24.078249626, 43.435558637, 4),
    ]]
    chamfer(chamfer2_edges, length=CHAMFER2_SIZE)


solid = part.part
